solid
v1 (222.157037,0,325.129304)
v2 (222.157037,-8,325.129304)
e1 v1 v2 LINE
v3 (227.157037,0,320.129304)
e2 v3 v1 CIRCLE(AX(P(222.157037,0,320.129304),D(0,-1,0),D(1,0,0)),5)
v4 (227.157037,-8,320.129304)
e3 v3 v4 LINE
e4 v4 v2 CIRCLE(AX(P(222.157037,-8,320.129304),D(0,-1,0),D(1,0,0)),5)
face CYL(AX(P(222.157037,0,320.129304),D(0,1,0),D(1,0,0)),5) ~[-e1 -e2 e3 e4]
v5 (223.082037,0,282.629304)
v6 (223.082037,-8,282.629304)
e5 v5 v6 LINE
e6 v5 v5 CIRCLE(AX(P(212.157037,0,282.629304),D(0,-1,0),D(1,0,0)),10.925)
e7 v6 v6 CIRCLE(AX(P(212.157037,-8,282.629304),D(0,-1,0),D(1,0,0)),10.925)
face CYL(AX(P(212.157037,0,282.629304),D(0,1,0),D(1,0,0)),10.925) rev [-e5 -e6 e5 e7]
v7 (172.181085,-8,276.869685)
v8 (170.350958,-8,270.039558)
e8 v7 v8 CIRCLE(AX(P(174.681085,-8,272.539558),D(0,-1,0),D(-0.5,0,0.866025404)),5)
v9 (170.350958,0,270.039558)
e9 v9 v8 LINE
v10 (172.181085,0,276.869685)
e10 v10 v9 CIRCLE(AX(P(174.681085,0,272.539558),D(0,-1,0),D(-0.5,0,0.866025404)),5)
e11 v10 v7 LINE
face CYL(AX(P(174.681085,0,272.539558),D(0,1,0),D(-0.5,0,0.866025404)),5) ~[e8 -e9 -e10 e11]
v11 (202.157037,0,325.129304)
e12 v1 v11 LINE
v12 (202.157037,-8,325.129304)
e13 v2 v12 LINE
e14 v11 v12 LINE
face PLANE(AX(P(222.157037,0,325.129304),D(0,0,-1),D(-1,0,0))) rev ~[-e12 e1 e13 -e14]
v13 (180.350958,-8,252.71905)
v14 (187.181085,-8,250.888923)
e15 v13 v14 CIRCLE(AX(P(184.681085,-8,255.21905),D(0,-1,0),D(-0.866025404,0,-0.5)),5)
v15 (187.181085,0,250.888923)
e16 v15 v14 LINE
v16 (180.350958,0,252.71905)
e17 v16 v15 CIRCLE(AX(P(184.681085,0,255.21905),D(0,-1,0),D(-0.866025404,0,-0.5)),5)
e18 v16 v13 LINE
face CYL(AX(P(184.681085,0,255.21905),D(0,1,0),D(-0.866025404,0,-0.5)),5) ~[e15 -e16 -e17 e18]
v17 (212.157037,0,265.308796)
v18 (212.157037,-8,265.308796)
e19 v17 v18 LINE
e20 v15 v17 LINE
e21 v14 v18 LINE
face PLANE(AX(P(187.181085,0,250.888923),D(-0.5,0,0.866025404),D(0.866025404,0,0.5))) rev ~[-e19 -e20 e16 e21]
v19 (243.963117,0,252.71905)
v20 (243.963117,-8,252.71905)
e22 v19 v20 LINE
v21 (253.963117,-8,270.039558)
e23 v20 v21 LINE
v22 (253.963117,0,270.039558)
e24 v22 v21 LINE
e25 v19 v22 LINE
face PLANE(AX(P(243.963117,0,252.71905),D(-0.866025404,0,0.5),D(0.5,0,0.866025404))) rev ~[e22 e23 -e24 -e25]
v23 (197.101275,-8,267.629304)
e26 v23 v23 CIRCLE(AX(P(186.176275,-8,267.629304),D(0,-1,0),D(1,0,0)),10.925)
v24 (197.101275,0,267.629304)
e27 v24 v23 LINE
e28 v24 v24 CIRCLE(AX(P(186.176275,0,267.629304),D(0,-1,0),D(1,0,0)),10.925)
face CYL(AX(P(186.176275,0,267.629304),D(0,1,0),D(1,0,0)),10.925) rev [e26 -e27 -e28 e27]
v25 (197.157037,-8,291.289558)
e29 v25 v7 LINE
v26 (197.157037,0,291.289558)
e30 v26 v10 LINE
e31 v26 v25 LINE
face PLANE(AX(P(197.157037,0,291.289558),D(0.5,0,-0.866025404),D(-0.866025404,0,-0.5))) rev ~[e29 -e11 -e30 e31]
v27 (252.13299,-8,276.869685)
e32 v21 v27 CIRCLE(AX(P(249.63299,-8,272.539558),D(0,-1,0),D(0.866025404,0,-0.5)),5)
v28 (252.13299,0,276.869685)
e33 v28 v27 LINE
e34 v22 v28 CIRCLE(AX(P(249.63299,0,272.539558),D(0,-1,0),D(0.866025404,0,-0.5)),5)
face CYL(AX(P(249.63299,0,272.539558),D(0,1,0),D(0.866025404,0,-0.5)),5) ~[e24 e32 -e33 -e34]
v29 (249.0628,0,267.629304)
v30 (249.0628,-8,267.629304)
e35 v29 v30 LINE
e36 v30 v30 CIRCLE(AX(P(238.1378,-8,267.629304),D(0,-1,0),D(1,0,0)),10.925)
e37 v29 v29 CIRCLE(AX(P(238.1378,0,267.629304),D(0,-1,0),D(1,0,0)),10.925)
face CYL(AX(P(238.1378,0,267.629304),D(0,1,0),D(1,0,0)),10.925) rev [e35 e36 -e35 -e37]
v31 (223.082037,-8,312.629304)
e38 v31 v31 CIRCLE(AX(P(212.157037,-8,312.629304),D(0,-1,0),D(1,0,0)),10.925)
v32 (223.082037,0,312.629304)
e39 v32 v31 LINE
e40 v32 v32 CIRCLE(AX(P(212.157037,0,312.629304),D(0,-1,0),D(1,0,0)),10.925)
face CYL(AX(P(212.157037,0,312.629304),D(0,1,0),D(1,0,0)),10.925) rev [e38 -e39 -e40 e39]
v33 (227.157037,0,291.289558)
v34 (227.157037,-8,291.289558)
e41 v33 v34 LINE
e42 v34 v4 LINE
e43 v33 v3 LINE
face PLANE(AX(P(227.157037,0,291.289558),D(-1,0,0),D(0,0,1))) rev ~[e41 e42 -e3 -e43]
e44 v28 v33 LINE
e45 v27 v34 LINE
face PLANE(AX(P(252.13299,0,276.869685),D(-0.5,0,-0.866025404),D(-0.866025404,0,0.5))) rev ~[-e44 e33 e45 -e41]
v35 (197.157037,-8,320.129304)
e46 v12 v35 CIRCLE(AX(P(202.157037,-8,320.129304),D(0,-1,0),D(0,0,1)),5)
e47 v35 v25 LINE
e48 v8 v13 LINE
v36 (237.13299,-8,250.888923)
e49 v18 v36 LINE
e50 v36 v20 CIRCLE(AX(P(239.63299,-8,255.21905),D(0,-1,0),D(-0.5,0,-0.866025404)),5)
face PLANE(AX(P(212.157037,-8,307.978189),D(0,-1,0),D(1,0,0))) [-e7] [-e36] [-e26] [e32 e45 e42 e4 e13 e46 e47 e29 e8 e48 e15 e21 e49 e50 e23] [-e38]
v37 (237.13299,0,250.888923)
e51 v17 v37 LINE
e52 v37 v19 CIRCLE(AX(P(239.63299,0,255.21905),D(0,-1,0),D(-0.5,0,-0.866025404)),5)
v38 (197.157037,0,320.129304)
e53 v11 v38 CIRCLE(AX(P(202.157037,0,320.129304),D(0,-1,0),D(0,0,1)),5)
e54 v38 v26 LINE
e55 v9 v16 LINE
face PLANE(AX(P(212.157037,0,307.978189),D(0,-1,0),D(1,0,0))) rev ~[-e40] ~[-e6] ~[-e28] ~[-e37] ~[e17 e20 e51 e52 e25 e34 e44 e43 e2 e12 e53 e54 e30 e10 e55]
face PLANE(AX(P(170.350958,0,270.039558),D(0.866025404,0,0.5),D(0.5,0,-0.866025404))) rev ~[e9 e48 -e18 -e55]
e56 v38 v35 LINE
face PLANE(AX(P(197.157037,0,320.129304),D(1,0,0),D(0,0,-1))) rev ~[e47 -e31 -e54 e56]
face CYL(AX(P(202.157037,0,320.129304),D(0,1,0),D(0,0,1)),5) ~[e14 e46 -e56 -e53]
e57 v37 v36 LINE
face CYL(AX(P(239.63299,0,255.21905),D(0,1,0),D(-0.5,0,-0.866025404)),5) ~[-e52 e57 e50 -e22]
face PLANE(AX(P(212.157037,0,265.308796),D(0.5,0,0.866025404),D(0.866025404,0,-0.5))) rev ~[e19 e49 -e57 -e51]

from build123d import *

# Parameters (mm, degrees)
F0_R     = 10.925
F1_DEPTH = 8


with BuildPart() as f1:
    # F0 (on Front) → F1 (new body)
    with BuildSketch(Plane.XZ):
        with BuildLine():
            ThreePointArc((227.1570374133, 320.1293041687), (225.6925713192, 323.6648380746), (222.1570374133, 325.1293041687))
            Line((222.1570374133, 325.1293041687), (202.1570374133, 325.1293041687))
            ThreePointArc((202.1570374133, 325.1293041687), (198.6215035074, 323.6648380746), (197.1570374133, 320.1293041687))
            Line((197.1570374133, 320.1293041687), (197.1570374133, 291.2895582065))
            Line((197.1570374133, 291.2895582065), (205.5064023187, 296.1100662822))
            Line((205.5064023187, 296.1100662822), (208.831719866, 301.8696852254))
            Line((208.831719866, 301.8696852254), (212.1570374133, 299.9498122444))
            Line((212.1570374133, 299.9498122444), (215.4823549606, 301.8696852254))
            Line((215.4823549606, 301.8696852254), (218.8076725079, 296.1100662822))
            Line((218.8076725079, 296.1100662822), (227.1570374133, 291.2895582065))
            Line((227.1570374133, 291.2895582065), (227.1570374133, 320.1293041687))
        make_face()
        with Locations((212.1570374133, 312.6293041687)):
            Circle(F0_R, mode=Mode.SUBTRACT)
        with BuildLine():
            Line((252.1329900552, 276.8696852254), (227.1570374133, 291.2895582065))
            Line((227.1570374133, 291.2895582065), (227.1570374133, 281.6485420551))
            Line((227.1570374133, 281.6485420551), (230.4823549606, 275.8889231119))
            Line((230.4823549606, 275.8889231119), (227.1570374133, 273.9690501308))
            Line((227.1570374133, 273.9690501308), (227.1570374133, 270.1293041687))
            Line((227.1570374133, 270.1293041687), (220.5064023187, 270.1293041687))
            Line((220.5064023187, 270.1293041687), (212.1570374133, 265.308796093))
            Line((212.1570374133, 265.308796093), (237.1329900552, 250.8889231119))
            ThreePointArc((237.1329900552, 250.8889231119), (240.9270852807, 250.3894209994), (243.9631170741, 252.7190501308))
            Line((243.9631170741, 252.7190501308), (253.9631170741, 270.0395582065))
            ThreePointArc((253.9631170741, 270.0395582065), (254.4626191867, 273.833653432), (252.1329900552, 276.8696852254))
        make_face()
        with Locations((238.1377995268, 267.6293041687)):
            Circle(F0_R, mode=Mode.SUBTRACT)
        Polygon((227.1570374133, 281.6485420551), (227.1570374133, 291.2895582065), (218.8076725079, 296.1100662822), align=None)
        Polygon((205.5064023187, 296.1100662822), (197.1570374133, 291.2895582065), (197.1570374133, 281.6485420551), align=None)
        with BuildLine():
            Line((197.1570374133, 281.6485420551), (197.1570374133, 291.2895582065))
            Line((197.1570374133, 291.2895582065), (172.1810847714, 276.8696852254))
            ThreePointArc((172.1810847714, 276.8696852254), (169.8514556399, 273.833653432), (170.3509577525, 270.0395582065))
            Line((170.3509577525, 270.0395582065), (180.3509577525, 252.7190501308))
            ThreePointArc((180.3509577525, 252.7190501308), (183.3869895459, 250.3894209994), (187.1810847714, 250.8889231119))
            Line((187.1810847714, 250.8889231119), (212.1570374133, 265.308796093))
            Line((212.1570374133, 265.308796093), (203.8076725079, 270.1293041687))
            Line((203.8076725079, 270.1293041687), (197.1570374133, 270.1293041687))
            Line((197.1570374133, 270.1293041687), (197.1570374133, 273.9690501308))
            Line((197.1570374133, 273.9690501308), (193.831719866, 275.8889231119))
            Line((193.831719866, 275.8889231119), (197.1570374133, 281.6485420551))
        make_face()
        with Locations((186.1762752998, 267.6293041687)):
            Circle(F0_R, mode=Mode.SUBTRACT)
        Polygon((212.1570374133, 265.308796093), (220.5064023187, 270.1293041687), (203.8076725079, 270.1293041687), align=None)
        Polygon((208.831719866, 301.8696852254), (205.5064023187, 296.1100662822), (212.1570374133, 299.9498122444), align=None)
        Polygon((212.1570374133, 299.9498122444), (218.8076725079, 296.1100662822), (215.4823549606, 301.8696852254), align=None)
        Polygon((227.1570374133, 273.9690501308), (227.1570374133, 281.6485420551), (218.8076725079, 296.1100662822), (212.1570374133, 299.9498122444), (205.5064023187, 296.1100662822), (197.1570374133, 281.6485420551), (197.1570374133, 273.9690501308), (203.8076725079, 270.1293041687), (220.5064023187, 270.1293041687), align=None)
        with Locations((212.1570374133, 282.6293041687)):
            Circle(F0_R, mode=Mode.SUBTRACT)
        Polygon((197.1570374133, 273.9690501308), (197.1570374133, 281.6485420551), (193.831719866, 275.8889231119), align=None)
        Polygon((203.8076725079, 270.1293041687), (197.1570374133, 273.9690501308), (197.1570374133, 270.1293041687), align=None)
        Polygon((227.1570374133, 270.1293041687), (227.1570374133, 273.9690501308), (220.5064023187, 270.1293041687), align=None)
        Polygon((230.4823549606, 275.8889231119), (227.1570374133, 281.6485420551), (227.1570374133, 273.9690501308), align=None)
    extrude(amount=F1_DEPTH)


solid = f1.part
